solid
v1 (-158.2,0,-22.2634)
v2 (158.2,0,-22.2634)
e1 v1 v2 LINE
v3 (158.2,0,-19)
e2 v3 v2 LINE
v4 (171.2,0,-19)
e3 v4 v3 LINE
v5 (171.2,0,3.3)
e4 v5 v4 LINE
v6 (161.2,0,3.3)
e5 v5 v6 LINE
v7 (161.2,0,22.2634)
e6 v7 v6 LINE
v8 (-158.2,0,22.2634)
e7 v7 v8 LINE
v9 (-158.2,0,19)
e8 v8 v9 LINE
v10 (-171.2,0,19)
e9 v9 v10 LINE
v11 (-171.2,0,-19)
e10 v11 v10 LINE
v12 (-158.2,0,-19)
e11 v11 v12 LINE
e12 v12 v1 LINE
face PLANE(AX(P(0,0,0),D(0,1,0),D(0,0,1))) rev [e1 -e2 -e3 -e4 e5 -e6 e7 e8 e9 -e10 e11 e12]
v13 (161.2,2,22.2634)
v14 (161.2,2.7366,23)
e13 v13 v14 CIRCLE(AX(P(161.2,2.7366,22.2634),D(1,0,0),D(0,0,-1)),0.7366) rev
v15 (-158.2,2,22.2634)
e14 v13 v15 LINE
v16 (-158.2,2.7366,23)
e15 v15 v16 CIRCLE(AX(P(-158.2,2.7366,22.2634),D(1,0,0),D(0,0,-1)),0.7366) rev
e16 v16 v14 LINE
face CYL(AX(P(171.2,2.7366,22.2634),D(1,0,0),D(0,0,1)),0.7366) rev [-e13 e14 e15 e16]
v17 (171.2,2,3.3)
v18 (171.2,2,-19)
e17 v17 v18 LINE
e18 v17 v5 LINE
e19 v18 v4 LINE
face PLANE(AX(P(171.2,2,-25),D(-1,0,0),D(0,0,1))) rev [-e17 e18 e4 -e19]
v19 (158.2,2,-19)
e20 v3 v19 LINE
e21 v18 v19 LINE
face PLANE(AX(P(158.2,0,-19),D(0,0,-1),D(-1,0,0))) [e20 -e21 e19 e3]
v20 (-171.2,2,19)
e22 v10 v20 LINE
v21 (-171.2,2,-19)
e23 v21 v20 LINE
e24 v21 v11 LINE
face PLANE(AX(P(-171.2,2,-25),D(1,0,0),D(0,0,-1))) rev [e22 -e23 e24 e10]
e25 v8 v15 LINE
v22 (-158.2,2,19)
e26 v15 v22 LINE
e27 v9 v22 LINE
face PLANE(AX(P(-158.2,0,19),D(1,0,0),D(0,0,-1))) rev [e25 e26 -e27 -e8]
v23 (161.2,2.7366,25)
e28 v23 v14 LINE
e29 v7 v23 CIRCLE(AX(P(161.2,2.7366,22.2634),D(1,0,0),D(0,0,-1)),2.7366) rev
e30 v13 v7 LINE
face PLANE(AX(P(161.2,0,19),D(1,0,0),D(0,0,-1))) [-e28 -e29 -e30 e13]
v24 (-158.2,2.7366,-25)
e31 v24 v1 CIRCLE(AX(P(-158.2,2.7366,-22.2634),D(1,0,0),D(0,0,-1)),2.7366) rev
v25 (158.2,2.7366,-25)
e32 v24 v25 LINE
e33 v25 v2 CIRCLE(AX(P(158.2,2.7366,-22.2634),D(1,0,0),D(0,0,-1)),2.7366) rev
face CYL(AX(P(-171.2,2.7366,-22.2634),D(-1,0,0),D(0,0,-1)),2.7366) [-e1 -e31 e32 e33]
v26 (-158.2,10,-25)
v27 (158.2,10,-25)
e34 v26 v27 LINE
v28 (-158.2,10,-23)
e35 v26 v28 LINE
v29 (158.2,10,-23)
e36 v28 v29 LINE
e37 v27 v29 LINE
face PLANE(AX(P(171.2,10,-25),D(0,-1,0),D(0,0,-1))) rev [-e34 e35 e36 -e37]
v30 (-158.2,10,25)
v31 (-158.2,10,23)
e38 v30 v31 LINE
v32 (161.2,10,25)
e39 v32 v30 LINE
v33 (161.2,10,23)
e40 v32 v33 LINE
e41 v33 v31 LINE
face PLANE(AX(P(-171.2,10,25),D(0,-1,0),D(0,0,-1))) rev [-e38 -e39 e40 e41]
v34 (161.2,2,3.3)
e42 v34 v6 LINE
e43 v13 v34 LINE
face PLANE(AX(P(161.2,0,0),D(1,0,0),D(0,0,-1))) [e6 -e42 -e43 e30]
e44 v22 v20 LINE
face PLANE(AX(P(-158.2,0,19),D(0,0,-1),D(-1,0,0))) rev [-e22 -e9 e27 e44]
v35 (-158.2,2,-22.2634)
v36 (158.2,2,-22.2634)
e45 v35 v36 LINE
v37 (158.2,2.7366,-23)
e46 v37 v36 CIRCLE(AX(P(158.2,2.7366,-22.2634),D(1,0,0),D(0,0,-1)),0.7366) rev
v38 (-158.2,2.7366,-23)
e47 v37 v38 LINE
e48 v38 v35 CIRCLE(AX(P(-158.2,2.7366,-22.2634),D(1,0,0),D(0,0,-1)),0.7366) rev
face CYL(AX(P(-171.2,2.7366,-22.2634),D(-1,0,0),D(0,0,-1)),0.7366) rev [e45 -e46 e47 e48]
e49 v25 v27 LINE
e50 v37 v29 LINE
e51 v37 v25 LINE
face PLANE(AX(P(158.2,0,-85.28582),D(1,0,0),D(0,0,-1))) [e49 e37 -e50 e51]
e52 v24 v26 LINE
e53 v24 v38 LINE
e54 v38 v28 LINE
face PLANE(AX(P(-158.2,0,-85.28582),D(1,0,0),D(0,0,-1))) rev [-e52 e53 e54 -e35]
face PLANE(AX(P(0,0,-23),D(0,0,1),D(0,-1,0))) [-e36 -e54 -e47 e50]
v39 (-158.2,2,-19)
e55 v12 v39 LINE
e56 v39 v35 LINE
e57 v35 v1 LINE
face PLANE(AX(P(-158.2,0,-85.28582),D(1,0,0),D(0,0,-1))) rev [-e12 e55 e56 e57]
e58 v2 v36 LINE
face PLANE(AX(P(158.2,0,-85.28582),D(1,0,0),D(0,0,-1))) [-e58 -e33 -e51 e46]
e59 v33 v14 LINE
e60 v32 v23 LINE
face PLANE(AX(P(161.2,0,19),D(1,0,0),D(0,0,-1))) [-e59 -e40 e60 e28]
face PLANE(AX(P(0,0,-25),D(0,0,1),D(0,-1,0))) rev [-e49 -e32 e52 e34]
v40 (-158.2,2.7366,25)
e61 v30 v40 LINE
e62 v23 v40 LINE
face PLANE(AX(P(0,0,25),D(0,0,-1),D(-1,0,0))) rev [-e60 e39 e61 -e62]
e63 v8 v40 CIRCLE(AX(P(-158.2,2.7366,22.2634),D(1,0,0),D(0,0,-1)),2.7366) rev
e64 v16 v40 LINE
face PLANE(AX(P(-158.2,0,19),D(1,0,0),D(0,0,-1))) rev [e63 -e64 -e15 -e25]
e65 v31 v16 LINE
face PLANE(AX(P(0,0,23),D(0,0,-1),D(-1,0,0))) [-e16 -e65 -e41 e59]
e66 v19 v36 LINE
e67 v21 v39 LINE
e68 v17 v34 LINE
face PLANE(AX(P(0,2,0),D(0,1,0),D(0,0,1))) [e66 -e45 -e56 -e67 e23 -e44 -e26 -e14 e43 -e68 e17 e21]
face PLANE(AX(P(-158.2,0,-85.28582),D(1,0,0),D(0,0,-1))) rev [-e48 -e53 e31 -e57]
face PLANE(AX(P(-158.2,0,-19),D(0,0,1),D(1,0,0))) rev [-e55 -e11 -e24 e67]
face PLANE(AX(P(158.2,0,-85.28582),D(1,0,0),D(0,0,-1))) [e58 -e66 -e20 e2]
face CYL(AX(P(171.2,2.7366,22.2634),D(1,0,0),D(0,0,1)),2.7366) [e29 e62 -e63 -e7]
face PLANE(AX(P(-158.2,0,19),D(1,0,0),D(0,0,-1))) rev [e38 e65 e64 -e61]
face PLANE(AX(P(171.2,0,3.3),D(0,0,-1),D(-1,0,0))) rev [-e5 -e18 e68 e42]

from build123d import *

# Parameters (mm, degrees)
SKETCH1_W                    = 342.4
SKETCH1_H                    = 50
BASE_FLANGE1_DEPTH           = 2
EDGE_FLANGE1_STRIP_W         = 9.4732
EDGE_FLANGE1_STRIP_H         = 2
EDGE_FLANGE1_STRIP_CUT_DEPTH = 342.4
EDGE_FLANGE1_DEPTH           = 342.4
EDGE_FLANGE2_STRIP_W         = 9.4732
EDGE_FLANGE2_STRIP_H         = 2
EDGE_FLANGE2_STRIP_CUT_DEPTH = 342.4
EDGE_FLANGE2_DEPTH           = 342.4
CUT_EXTRUDE2_DEPTH           = 334.488770426
CUT_EXTRUDE3_DEPTH           = 174.200577366
MOVE_START                   = 158.2
MOVE_FACE1_DEPTH             = 3


# Read off the part's stored shape, not the designer's step: Move Face1
# Sheet-metal steps are written as plain solids
with BuildPart() as part:
    # Sketch1 → Base-Flange1 (new body)
    with BuildSketch(Plane(origin=(0, 0, 0), x_dir=(1, 0, 0), z_dir=(0, 1, 0))):
        Rectangle(SKETCH1_W, SKETCH1_H)
    extrude(amount=BASE_FLANGE1_DEPTH)

    # Edge-Flange1 strip (across the edge) → Edge-Flange1 strip cut (cut)
    with BuildSketch(Plane(origin=(-171.2, 2, 25), x_dir=(0, 0, -1), z_dir=(1, 0, 0))):
        with Locations((-2, -1)):
            Rectangle(EDGE_FLANGE1_STRIP_W, EDGE_FLANGE1_STRIP_H)
    extrude(amount=EDGE_FLANGE1_STRIP_CUT_DEPTH, mode=Mode.SUBTRACT)

    # Edge-Flange1 section (across the edge) → Edge-Flange1 (add)
    with BuildSketch(Plane(origin=(-171.2, 2, 25), x_dir=(0, 0, -1), z_dir=(1, 0, 0))):
        with BuildLine():
            Line((0, 0.7366), (0, 8))
            Line((0, 8), (2, 8))
            Line((2, 8), (2, 0.7366))
            ThreePointArc((2, 0.7366), (2.215745145, 0.215745145), (2.7366, 0))
            Line((2.7366, 0), (2.7366, -2))
            ThreePointArc((2.7366, -2), (0.801531583, -1.198468417), (0, 0.7366))
        make_face()
    extrude(amount=EDGE_FLANGE1_DEPTH)

    # Edge-Flange2 strip (across the edge) → Edge-Flange2 strip cut (cut)
    with BuildSketch(Plane(origin=(171.2, 2, -25), x_dir=(0, 0, 1), z_dir=(-1, 0, 0))):
        with Locations((-2, -1)):
            Rectangle(EDGE_FLANGE2_STRIP_W, EDGE_FLANGE2_STRIP_H)
    extrude(amount=EDGE_FLANGE2_STRIP_CUT_DEPTH, mode=Mode.SUBTRACT)

    # Edge-Flange2 section (across the edge) → Edge-Flange2 (add)
    with BuildSketch(Plane(origin=(171.2, 2, -25), x_dir=(0, 0, 1), z_dir=(-1, 0, 0))):
        with BuildLine():
            Line((0, 0.7366), (0, 8))
            Line((0, 8), (2, 8))
            Line((2, 8), (2, 0.7366))
            ThreePointArc((2, 0.7366), (2.215745145, 0.215745145), (2.7366, 0))
            Line((2.7366, 0), (2.7366, -2))
            ThreePointArc((2.7366, -2), (0.801531583, -1.198468417), (0, 0.7366))
        make_face()
    extrude(amount=EDGE_FLANGE2_DEPTH)

    # Sketch18 → Cut-Extrude2 (cut, through all)
    with BuildSketch(Plane(origin=(161.2, 0, 0), x_dir=(0, 0, -1), z_dir=(1, 0, 0))):
        Polygon((-3.3, 6.000000001), (-3.3, 10.000000001), (-37.658134746, 10.000000001), (-37.658134746, -5.535311506), (-3.3, -5.535311506), align=None)
    extrude(amount=CUT_EXTRUDE2_DEPTH, mode=Mode.SUBTRACT)

    # Sketch19 → Cut-Extrude3 (cut, symmetric)
    with BuildSketch(Plane(origin=(0, 2, 0), x_dir=(1, 0, 0), z_dir=(0, 1, 0))):
        Polygon((-249.45231786, 85.285820153), (-158.2, 85.285820153), (-158.2, 19), (-209.845513649, 19), (-209.845513649, -19), (-158.2, -19), (-158.2, -89.848436046), (-249.45231786, -89.848436046), align=None)
    cut_extrude3 = extrude(amount=CUT_EXTRUDE3_DEPTH, both=True, mode=Mode.SUBTRACT)

    # Mirror1: Cut-Extrude3 across plane
    add(cut_extrude3.mirror(Plane(origin=(0, 0, 0), x_dir=(0, 0, 1), z_dir=(1, 0, 0))), mode=Mode.SUBTRACT)

    # Move Face1 outline → Move Face1 (add)
    with BuildSketch(Plane.YZ.offset(MOVE_START)):
        with BuildLine():
            Line((0, 19), (2, 19))
            Line((2, 19), (2, 22.2634))
            ThreePointArc((2, 22.2634), (2.215745145, 22.784254855), (2.7366, 23))
            Line((2.7366, 23), (10.000000001, 23))
            Line((10.000000001, 23), (10, 25))
            Line((10, 25), (2.7366, 25))
            ThreePointArc((2.7366, 25), (0.801531583, 24.198468417), (0, 22.2634))
            Line((0, 22.2634), (0, 19))
        make_face()
    extrude(amount=MOVE_FACE1_DEPTH)


solid = part.part
